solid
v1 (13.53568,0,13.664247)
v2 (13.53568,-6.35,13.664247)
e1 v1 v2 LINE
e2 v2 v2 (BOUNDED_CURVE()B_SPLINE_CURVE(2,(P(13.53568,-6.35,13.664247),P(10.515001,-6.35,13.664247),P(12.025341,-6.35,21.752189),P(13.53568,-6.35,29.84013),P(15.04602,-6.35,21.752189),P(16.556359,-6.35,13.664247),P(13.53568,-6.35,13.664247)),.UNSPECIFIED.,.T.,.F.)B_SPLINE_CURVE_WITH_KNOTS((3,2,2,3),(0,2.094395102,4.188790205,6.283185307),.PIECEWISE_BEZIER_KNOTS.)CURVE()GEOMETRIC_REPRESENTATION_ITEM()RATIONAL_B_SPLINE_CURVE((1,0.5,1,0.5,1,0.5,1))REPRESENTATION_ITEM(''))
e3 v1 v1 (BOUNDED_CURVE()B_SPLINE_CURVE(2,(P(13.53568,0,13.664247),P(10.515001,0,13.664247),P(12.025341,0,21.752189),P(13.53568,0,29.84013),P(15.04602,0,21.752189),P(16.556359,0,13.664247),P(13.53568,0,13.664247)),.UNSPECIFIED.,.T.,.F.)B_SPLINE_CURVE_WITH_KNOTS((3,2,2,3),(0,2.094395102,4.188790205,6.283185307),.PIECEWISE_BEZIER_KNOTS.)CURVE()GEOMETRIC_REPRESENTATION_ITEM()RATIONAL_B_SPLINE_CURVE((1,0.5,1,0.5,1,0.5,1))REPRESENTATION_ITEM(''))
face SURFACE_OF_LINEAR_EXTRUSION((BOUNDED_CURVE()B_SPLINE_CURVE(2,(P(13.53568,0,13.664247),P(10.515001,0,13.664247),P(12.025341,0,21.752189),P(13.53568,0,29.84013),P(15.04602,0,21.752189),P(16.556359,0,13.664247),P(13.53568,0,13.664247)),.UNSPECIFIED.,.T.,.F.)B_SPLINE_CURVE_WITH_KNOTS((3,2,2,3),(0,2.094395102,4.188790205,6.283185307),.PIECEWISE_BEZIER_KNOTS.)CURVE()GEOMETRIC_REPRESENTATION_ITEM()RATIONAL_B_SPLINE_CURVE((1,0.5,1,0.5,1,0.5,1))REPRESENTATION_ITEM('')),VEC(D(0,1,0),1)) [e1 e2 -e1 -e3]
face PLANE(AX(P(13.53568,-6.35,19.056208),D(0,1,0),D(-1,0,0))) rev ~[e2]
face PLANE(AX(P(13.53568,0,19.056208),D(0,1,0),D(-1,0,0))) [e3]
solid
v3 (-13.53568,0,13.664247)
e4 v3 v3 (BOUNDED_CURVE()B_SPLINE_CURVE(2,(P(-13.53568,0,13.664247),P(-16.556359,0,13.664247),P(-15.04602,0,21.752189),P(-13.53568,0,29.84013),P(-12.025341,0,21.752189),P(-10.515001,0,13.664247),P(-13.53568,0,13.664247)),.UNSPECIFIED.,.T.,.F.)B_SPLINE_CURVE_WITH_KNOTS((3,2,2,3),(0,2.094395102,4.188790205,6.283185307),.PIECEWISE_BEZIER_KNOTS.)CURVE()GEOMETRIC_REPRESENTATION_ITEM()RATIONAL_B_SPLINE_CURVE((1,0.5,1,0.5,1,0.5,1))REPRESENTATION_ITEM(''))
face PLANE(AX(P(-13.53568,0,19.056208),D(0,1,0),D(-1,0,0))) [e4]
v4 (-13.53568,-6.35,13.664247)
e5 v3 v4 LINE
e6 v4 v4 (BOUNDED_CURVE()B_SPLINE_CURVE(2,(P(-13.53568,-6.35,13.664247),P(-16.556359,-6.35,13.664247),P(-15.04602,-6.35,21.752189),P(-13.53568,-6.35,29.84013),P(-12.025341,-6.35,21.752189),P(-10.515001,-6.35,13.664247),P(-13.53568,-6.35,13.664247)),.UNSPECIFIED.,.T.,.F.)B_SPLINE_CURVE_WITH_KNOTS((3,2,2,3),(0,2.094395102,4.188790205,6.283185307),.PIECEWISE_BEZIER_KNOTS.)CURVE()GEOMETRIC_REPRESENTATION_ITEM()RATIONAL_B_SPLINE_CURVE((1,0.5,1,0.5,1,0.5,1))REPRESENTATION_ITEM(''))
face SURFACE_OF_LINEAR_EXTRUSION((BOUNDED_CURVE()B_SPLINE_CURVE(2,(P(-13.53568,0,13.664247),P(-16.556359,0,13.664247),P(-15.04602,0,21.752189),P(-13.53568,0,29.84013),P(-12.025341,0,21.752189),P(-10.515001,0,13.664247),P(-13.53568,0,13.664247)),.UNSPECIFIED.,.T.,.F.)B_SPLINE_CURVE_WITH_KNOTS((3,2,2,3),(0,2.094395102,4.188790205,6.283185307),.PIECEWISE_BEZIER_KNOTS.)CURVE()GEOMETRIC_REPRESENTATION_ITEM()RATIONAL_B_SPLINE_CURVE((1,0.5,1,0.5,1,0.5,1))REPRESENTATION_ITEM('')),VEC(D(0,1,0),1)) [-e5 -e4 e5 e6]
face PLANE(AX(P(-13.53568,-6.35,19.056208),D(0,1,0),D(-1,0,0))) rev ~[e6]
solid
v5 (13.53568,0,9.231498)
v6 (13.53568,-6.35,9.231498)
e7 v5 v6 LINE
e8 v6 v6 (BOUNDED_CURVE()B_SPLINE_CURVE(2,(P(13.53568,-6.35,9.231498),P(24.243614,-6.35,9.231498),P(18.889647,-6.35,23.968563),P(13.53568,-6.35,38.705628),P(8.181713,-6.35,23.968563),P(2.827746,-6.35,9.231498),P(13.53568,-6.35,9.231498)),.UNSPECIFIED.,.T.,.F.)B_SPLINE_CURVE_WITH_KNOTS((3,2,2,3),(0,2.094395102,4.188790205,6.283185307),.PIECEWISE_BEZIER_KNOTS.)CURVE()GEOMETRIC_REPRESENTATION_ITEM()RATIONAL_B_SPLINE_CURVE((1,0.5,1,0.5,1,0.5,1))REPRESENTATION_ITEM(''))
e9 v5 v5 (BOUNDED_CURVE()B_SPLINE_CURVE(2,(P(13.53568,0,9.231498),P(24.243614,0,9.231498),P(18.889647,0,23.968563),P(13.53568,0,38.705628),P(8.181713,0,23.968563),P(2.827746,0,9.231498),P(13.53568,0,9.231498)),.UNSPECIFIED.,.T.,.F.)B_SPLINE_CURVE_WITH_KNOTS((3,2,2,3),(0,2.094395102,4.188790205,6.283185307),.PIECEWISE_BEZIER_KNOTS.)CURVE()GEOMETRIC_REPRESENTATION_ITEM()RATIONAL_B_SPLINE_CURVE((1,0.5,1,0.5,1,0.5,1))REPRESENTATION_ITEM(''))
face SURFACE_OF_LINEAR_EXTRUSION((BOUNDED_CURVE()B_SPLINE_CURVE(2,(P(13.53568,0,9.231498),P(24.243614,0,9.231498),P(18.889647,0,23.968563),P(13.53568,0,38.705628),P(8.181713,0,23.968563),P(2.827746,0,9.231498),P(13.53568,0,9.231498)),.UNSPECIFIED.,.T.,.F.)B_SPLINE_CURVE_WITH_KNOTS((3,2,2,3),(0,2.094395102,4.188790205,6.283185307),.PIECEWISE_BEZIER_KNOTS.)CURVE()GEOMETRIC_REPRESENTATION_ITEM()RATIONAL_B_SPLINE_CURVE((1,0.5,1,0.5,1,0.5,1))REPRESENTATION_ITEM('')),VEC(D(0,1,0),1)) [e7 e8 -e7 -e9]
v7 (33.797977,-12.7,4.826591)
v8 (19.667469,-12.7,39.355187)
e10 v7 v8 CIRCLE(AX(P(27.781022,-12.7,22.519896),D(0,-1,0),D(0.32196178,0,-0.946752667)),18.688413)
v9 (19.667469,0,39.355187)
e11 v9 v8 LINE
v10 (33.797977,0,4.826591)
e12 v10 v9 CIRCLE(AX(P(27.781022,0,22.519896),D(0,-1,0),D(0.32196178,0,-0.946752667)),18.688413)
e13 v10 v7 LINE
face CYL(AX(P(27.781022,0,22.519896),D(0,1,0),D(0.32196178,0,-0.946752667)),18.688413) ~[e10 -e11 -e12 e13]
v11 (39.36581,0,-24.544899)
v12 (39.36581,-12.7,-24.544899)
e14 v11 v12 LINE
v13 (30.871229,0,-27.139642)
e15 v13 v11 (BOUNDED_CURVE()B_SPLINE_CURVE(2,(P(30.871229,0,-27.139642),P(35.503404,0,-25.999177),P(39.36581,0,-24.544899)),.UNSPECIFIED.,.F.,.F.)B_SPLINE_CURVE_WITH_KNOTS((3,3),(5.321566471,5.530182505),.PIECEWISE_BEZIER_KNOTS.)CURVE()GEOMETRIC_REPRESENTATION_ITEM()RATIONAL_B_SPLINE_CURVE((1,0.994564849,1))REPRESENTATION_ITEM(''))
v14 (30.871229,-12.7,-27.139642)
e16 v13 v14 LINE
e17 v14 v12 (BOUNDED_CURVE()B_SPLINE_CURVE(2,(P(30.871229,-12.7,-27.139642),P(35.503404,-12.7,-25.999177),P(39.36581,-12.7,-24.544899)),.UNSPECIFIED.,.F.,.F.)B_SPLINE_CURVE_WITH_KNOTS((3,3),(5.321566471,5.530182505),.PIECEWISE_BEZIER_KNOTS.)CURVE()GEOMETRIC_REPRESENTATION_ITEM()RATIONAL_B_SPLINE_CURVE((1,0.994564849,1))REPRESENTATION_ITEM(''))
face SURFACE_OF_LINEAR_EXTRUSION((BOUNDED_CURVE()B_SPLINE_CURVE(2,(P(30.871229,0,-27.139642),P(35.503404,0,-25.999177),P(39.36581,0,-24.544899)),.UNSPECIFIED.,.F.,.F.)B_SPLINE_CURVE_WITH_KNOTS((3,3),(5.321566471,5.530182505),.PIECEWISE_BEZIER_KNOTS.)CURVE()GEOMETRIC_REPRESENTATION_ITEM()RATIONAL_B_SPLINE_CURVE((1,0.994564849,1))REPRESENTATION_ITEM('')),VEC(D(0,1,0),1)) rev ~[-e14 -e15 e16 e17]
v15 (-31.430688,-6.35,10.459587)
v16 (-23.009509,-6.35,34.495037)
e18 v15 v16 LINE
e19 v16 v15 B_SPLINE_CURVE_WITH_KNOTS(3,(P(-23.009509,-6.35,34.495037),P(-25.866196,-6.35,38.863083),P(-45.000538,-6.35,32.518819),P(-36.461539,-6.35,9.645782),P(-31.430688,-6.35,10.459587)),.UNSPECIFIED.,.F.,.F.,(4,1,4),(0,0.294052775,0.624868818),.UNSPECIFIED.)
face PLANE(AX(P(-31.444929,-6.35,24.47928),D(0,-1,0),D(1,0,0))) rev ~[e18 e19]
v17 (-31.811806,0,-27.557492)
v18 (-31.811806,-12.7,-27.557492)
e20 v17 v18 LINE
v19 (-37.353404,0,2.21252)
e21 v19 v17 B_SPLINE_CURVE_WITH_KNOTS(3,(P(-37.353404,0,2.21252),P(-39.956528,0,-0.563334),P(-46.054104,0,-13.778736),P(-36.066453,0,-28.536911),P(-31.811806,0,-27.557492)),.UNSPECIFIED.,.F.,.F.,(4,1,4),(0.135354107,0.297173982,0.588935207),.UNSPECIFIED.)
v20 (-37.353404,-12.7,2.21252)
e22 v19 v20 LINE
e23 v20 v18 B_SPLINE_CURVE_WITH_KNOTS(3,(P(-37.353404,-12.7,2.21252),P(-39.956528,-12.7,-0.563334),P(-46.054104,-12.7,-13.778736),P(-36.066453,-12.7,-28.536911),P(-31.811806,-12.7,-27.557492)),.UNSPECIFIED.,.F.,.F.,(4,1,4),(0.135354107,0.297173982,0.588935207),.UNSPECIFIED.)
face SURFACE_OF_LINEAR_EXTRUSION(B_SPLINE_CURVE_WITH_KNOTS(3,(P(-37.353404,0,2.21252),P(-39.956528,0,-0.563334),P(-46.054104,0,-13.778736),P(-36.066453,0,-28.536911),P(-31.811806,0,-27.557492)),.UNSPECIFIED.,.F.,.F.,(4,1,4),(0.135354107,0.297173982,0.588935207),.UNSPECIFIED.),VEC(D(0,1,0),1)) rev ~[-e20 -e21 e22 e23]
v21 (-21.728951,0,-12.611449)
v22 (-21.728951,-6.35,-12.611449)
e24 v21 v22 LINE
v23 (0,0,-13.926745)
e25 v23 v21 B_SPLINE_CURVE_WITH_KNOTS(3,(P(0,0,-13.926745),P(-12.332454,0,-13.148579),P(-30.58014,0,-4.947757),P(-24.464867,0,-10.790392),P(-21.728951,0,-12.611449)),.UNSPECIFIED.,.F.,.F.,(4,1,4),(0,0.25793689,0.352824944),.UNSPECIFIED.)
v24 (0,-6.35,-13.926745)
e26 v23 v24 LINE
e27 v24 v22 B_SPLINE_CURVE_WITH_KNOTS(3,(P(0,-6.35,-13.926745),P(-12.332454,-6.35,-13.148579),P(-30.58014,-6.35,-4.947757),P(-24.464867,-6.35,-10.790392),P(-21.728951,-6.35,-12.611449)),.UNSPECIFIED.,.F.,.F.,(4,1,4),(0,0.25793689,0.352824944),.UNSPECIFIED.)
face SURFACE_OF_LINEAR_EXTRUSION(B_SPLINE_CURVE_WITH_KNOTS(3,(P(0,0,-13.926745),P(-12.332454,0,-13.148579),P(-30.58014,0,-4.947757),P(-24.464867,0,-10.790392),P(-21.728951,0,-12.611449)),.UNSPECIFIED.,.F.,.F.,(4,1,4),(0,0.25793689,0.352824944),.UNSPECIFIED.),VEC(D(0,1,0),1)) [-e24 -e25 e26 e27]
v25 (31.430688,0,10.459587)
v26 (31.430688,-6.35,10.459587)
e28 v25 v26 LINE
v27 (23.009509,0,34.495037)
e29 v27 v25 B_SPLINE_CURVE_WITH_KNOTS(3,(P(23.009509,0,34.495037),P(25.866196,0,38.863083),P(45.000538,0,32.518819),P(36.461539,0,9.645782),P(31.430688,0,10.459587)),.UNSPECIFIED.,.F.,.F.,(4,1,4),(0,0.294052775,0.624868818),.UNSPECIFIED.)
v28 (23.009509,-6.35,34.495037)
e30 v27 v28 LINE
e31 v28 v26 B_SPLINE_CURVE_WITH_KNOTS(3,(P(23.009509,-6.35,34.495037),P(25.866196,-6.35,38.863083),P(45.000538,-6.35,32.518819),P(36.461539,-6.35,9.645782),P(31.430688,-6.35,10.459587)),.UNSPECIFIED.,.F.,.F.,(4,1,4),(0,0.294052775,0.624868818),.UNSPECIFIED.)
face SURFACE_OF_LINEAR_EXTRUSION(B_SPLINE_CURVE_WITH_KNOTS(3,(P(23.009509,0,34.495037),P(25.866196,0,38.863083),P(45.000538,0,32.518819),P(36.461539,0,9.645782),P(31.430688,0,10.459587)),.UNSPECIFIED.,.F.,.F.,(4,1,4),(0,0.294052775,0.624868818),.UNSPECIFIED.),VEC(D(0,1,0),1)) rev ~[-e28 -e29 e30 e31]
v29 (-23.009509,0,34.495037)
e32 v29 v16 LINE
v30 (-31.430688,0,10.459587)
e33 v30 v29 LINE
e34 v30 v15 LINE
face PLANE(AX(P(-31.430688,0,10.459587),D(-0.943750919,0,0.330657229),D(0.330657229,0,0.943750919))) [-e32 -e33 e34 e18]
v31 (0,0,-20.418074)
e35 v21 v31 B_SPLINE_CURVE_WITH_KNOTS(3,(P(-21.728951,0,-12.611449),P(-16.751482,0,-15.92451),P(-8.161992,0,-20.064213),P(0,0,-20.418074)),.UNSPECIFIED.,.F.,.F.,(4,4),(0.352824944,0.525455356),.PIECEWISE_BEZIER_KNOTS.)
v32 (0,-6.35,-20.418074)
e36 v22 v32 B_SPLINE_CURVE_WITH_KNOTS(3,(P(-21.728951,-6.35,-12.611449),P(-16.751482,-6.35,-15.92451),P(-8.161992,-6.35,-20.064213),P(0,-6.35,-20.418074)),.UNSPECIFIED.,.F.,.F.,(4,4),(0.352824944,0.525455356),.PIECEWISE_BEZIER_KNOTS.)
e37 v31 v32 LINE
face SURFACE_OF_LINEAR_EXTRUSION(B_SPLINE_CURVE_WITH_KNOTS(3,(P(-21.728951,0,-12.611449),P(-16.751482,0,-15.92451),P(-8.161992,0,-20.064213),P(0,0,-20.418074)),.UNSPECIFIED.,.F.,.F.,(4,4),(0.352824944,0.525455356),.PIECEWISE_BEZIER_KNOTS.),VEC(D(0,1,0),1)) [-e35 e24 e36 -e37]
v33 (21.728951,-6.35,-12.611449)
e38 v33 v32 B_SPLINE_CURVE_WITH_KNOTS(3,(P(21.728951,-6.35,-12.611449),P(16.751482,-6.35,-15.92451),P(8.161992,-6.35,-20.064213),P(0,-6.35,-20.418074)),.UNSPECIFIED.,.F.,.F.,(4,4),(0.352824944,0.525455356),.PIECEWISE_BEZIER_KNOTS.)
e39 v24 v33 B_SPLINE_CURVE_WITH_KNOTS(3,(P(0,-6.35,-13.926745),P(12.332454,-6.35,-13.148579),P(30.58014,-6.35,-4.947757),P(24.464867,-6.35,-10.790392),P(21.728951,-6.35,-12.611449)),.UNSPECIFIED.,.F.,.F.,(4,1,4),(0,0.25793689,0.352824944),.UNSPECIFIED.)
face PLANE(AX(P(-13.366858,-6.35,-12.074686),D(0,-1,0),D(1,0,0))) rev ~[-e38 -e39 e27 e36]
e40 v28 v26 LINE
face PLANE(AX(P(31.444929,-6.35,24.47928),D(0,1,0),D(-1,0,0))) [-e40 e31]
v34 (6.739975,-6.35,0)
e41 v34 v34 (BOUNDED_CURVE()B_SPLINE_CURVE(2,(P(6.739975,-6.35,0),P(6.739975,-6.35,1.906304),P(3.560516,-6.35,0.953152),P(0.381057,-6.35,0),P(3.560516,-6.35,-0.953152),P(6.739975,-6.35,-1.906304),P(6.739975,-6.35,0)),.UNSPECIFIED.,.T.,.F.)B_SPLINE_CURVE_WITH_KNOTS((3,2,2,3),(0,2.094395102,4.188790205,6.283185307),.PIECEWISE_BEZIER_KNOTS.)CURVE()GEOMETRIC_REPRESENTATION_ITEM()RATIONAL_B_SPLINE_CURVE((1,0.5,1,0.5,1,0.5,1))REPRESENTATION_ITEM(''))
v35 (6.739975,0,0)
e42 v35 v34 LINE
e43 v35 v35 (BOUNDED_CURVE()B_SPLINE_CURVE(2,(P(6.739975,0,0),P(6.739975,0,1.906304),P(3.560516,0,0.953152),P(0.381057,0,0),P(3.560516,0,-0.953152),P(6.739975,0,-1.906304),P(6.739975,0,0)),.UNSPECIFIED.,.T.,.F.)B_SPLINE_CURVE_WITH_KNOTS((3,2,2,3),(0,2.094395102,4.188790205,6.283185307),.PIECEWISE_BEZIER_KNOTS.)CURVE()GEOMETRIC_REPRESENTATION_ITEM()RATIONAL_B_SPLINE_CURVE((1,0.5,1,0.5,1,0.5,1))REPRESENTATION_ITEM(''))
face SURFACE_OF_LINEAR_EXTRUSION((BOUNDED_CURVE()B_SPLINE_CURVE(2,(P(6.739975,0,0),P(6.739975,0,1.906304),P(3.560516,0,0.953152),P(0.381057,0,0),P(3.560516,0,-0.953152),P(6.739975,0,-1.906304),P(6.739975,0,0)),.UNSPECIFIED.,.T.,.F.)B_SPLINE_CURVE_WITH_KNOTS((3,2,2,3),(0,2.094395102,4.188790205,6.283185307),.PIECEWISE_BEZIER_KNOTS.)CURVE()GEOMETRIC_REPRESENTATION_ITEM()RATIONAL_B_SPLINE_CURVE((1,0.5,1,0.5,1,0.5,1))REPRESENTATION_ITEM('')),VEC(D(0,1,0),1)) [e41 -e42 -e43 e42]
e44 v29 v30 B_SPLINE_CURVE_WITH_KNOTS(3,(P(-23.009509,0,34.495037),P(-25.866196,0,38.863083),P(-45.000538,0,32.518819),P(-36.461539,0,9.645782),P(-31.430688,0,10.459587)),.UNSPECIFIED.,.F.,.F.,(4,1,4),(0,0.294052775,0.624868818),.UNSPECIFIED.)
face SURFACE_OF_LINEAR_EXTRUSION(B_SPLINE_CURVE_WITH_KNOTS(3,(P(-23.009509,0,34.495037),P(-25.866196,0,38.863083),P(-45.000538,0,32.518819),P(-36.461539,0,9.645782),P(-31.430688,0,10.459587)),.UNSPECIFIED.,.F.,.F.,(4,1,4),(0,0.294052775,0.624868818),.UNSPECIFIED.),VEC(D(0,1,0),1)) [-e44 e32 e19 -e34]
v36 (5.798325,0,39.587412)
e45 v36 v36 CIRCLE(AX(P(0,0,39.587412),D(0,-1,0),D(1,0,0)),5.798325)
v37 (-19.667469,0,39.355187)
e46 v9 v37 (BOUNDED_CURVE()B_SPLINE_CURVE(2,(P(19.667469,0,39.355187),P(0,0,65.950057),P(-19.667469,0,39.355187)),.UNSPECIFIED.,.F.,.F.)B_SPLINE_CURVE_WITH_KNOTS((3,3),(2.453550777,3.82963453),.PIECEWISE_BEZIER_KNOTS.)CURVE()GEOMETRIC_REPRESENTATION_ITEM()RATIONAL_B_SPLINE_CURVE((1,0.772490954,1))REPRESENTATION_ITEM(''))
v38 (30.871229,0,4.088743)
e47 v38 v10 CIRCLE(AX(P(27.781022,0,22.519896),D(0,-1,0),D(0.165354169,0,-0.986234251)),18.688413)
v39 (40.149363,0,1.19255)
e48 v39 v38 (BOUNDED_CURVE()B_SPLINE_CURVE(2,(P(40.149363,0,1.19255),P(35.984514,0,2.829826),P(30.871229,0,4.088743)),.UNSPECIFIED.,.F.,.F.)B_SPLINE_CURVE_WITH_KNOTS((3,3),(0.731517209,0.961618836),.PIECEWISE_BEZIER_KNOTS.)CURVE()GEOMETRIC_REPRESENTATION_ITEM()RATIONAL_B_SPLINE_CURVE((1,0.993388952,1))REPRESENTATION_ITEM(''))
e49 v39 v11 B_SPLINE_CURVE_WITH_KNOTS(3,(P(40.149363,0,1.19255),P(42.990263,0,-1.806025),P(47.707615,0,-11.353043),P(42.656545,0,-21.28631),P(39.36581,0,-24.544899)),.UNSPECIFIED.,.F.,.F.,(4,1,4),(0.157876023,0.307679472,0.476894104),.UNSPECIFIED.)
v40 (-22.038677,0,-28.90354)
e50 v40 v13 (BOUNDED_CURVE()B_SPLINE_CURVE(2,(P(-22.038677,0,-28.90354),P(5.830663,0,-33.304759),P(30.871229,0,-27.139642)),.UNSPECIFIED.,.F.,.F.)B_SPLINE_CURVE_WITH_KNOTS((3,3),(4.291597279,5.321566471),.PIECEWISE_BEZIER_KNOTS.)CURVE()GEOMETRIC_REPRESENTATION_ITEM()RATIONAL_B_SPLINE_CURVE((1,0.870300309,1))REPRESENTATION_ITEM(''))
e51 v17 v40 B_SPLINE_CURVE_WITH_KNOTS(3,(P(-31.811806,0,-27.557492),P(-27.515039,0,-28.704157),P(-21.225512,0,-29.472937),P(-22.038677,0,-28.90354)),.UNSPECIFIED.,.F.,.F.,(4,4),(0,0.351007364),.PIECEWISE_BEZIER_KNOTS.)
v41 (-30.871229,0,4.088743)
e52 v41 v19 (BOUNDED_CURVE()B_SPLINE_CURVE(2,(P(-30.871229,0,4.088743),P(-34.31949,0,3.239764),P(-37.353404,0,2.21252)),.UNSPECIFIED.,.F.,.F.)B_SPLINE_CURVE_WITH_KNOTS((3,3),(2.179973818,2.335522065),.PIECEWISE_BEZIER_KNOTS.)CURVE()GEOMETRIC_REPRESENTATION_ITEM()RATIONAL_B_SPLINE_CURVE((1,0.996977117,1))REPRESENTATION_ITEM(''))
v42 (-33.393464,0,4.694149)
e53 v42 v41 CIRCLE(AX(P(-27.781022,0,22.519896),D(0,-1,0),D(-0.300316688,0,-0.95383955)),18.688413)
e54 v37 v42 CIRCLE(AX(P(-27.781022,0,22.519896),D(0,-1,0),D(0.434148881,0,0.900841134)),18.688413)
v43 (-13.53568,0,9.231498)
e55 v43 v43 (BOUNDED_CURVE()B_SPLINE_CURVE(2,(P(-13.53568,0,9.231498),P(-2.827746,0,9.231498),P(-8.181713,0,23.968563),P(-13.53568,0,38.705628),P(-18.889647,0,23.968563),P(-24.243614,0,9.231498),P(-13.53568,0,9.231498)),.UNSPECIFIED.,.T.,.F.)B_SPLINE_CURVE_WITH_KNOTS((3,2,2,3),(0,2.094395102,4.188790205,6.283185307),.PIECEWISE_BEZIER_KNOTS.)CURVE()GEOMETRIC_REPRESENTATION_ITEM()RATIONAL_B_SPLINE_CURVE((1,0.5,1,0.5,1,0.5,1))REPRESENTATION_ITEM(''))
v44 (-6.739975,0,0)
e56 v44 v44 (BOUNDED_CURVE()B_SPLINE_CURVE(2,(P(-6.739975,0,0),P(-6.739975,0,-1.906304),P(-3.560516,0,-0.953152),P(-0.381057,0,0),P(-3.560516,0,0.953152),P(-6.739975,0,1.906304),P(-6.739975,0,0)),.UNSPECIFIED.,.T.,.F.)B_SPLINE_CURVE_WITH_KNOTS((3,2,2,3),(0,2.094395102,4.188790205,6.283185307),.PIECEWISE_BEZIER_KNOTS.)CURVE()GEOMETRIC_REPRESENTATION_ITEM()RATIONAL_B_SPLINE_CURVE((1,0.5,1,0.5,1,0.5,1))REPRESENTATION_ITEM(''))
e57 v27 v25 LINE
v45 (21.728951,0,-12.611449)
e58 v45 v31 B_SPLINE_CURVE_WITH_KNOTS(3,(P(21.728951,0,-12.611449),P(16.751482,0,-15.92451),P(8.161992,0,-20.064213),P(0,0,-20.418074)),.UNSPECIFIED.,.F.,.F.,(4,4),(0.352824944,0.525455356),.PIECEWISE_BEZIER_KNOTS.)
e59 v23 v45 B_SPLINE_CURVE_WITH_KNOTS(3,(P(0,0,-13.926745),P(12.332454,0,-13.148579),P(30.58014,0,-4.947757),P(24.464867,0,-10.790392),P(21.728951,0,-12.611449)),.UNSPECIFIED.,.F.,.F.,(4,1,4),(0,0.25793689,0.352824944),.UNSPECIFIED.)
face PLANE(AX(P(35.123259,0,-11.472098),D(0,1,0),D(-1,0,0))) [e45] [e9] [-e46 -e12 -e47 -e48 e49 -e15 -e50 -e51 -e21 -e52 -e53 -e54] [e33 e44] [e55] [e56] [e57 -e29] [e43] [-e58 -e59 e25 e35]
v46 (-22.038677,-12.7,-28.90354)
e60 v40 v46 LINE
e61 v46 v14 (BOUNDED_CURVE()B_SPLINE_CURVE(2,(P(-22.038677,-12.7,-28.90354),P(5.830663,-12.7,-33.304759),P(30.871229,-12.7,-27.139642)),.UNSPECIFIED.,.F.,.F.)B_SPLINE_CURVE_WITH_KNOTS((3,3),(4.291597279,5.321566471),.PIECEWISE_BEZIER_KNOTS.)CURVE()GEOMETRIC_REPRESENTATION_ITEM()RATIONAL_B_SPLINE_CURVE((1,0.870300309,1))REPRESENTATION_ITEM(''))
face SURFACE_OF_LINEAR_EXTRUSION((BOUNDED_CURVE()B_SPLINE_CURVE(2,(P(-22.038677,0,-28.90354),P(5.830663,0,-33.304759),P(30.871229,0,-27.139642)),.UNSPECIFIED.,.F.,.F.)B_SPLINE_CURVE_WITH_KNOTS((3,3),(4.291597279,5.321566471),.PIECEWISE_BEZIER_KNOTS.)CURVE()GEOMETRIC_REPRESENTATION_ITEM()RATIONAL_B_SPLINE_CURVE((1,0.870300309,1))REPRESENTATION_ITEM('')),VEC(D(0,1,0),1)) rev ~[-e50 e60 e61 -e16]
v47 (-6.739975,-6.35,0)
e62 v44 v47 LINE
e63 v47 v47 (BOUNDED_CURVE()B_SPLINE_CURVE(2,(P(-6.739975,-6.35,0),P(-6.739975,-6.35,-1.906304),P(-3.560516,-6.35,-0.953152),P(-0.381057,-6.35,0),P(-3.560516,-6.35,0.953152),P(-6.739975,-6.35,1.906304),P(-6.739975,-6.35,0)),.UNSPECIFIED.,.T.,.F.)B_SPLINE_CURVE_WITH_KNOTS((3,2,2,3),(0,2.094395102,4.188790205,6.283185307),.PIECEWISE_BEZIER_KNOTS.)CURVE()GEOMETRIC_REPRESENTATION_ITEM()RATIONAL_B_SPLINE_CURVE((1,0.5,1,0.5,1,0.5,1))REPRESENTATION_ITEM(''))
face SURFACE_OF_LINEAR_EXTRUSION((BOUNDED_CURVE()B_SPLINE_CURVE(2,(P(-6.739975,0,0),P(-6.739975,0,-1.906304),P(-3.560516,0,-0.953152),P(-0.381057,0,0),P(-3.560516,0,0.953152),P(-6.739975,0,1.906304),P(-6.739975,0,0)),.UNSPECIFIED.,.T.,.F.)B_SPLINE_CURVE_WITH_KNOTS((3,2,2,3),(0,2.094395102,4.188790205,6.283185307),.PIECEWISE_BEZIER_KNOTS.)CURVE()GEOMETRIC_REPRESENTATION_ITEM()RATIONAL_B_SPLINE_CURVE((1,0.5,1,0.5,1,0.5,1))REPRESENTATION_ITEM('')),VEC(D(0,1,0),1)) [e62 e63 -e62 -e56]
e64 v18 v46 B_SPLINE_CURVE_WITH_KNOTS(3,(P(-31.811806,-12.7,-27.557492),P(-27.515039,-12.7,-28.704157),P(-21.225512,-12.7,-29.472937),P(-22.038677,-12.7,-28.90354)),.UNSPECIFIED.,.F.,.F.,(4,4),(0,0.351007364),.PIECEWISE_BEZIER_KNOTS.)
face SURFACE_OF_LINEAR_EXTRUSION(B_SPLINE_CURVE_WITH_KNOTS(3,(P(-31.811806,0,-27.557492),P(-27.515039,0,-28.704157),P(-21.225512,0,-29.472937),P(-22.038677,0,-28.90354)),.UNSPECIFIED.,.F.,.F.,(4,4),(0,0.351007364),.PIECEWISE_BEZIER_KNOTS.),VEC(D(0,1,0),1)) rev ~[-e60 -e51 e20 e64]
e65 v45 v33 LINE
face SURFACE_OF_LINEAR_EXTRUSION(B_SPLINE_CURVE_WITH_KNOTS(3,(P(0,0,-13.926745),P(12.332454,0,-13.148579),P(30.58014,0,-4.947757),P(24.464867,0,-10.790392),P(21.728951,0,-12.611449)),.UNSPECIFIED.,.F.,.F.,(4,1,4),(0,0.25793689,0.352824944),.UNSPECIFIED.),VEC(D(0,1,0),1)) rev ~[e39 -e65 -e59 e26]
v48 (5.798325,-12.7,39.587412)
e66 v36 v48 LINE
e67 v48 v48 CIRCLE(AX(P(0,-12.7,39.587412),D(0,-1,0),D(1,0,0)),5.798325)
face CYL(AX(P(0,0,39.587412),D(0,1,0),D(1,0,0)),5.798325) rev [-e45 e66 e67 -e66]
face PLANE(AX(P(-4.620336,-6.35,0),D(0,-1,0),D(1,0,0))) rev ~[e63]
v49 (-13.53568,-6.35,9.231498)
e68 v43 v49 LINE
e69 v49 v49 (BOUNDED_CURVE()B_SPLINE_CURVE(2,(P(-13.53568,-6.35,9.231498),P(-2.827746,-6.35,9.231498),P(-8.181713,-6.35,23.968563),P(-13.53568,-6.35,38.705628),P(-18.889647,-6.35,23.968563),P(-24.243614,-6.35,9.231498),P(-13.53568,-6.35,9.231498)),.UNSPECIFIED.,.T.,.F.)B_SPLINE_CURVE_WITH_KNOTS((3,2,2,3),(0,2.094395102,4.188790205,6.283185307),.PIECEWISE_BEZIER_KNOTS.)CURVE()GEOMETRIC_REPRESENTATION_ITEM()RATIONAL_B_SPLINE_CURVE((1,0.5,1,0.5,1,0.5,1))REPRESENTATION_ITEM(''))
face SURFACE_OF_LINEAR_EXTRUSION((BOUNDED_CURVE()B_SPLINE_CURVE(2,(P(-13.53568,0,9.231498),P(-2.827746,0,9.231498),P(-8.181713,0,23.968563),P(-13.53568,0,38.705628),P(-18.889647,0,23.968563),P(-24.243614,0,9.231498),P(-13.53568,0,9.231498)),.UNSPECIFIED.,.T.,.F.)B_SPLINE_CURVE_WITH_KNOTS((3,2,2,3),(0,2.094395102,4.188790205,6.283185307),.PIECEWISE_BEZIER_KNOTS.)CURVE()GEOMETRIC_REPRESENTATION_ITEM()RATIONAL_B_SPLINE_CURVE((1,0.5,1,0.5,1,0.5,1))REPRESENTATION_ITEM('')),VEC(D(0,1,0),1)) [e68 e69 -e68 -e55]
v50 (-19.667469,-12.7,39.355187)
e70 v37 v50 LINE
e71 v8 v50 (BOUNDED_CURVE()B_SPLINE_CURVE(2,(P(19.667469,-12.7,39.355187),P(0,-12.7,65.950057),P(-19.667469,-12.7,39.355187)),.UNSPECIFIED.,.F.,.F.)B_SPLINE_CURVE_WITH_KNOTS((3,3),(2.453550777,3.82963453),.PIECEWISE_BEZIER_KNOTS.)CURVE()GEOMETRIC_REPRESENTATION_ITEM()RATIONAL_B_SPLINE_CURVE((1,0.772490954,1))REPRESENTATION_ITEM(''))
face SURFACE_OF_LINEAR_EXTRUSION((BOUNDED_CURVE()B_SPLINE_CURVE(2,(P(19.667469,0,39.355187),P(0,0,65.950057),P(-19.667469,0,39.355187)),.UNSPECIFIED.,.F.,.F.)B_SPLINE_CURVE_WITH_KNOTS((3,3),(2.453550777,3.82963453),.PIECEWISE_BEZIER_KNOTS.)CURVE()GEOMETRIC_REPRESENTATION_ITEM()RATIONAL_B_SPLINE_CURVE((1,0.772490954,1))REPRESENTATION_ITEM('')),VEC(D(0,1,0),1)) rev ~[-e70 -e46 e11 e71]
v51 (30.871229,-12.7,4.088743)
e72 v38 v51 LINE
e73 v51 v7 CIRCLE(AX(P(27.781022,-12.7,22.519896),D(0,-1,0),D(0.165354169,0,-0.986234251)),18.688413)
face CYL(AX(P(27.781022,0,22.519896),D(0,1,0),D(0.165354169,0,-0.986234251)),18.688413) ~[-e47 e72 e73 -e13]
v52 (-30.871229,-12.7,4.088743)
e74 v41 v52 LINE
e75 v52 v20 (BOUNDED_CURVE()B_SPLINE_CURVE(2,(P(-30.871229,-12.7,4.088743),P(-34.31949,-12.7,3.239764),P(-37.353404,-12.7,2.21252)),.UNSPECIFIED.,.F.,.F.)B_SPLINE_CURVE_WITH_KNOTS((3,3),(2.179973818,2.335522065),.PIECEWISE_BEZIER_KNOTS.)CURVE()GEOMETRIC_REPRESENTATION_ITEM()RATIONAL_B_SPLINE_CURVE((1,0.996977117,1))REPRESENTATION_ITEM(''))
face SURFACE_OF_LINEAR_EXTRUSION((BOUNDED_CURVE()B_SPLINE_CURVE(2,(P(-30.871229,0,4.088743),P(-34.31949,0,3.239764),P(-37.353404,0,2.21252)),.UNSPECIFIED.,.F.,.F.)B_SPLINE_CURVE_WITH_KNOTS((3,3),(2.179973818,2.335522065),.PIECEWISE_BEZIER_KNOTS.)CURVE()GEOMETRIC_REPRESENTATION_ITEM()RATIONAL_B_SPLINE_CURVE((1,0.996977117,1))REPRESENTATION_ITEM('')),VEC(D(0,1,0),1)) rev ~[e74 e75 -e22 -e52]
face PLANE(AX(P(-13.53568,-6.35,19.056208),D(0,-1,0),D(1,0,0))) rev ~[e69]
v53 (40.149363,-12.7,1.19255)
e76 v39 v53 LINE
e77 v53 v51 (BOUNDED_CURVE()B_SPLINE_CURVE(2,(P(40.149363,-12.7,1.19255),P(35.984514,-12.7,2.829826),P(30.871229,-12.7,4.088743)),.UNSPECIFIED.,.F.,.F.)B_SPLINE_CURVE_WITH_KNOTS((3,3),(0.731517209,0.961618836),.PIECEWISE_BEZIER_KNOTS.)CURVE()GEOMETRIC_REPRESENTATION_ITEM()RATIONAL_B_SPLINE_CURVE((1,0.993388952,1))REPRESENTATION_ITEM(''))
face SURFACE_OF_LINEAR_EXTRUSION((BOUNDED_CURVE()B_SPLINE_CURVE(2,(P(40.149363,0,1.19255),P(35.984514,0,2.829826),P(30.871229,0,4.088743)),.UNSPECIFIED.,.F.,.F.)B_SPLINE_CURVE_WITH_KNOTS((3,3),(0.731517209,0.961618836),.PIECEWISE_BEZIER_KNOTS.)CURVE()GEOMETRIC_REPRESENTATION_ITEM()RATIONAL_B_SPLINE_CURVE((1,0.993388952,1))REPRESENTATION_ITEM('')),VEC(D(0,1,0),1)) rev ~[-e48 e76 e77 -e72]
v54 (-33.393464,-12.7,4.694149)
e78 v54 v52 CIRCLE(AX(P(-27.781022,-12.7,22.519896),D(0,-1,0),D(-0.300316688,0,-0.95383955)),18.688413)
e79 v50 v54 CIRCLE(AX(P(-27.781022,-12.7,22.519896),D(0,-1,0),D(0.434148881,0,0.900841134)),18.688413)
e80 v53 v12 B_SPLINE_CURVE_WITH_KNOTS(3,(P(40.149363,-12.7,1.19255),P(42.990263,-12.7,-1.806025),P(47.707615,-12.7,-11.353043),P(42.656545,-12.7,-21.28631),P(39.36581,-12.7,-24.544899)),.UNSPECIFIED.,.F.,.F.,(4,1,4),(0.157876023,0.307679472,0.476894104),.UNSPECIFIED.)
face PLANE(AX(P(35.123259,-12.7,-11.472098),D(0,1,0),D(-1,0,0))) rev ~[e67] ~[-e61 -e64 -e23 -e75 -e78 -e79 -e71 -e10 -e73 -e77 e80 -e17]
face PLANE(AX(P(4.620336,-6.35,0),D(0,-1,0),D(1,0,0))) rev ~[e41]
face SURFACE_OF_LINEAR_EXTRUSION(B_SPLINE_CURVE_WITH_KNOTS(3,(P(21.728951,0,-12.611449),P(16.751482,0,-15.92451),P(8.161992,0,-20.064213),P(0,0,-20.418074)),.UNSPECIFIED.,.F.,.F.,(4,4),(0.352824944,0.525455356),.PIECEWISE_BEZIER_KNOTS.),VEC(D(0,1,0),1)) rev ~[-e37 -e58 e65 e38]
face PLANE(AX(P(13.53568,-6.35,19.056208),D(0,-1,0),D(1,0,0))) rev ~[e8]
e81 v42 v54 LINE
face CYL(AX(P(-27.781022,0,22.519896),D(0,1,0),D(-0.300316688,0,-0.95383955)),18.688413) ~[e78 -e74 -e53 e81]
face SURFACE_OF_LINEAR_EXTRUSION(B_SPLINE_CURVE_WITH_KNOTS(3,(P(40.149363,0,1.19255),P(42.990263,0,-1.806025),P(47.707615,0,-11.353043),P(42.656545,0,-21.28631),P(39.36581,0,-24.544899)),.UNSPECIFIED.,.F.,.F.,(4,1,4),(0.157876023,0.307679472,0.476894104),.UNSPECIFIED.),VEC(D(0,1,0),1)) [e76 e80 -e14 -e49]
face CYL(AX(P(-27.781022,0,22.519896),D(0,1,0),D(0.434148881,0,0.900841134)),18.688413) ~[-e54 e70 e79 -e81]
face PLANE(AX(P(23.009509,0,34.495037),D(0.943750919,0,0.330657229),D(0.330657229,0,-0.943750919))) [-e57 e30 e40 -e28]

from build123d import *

# Parameters (mm, degrees)
F1_DEPTH = 12.7
F3_DEPTH = 6.35
F5_DEPTH = 6.35
F6_R     = 5.7983245301
F7_DEPTH = 12.7


# Not quite as in the source:
# - a feature names something its author has since deleted; it is built from what else it names


with BuildPart() as f1:
    # F0 (on Front) → F1 (new body)
    with BuildSketch(Plane.XZ):
        with BuildLine():
            add(Edge.make_bspline(
                [(40.1493628068, 1.1925501326), (42.9902625136, -1.8060247086), (47.7076151577, -11.3530425376), (42.6565450289, -21.2863101438), (39.3658101892, -24.5448989348)],
                knots=[0.1578760235, 0.1578760235, 0.1578760235, 0.1578760235, 0.3076794717, 0.476894104, 0.476894104, 0.476894104, 0.476894104], degree=3))
            add(Edge.make_bspline(
                [(40.1493628068, 1.1925501326), (35.9845138771, 2.8298261079), (30.8712290795, 4.0887432654)],
                knots=[0.7315172092, 0.7315172092, 0.7315172092, 0.9616188361, 0.9616188361, 0.9616188361], degree=2, weights=[1, 0.9933889524, 1]))
            add(Edge.make_bspline(
                [(30.8712290795, -27.1396419515), (24.7144737369, -23.1861092597), (24.6668360543, -0.155679542), (30.8712290795, 4.0887432654)],
                knots=[0.6225566131, 0.6225566131, 0.6225566131, 0.6225566131, 1, 1, 1, 1], degree=3))
            add(Edge.make_bspline(
                [(30.8712290795, -27.1396419515), (35.5034035213, -25.9991766513), (39.3658101892, -24.5448989348)],
                knots=[5.3215664711, 5.3215664711, 5.3215664711, 5.530182505, 5.530182505, 5.530182505], degree=2, weights=[1, 0.9945648494, 1]))
        make_face()
        with BuildLine():
            add(Edge.make_bspline(
                [(30.8712290795, -27.1396419515), (24.7144737369, -23.1861092597), (24.6668360543, -0.155679542), (30.8712290795, 4.0887432654)],
                knots=[0.6225566131, 0.6225566131, 0.6225566131, 0.6225566131, 1, 1, 1, 1], degree=3))
            add(Edge.make_bspline(
                [(30.8712290795, 4.0887432654), (0, 11.6893994973), (-30.8712290795, 4.0887432654)],
                knots=[0.9616188361, 0.9616188361, 0.9616188361, 2.1799738175, 2.1799738175, 2.1799738175], degree=2, weights=[1, 0.8201189293, 1]))
            add(Edge.make_bspline(
                [(-30.316427276, -26.6621504769), (-25.7197611969, -21.8642187355), (-25.8183679957, 0.1889268802), (-30.8712290795, 4.0887432654)],
                knots=[0.6258895591, 0.6258895591, 0.6258895591, 0.6258895591, 1, 1, 1, 1], degree=3))
            add(Edge.make_bspline(
                [(-22.0386772722, -28.9035404471), (-22.6123014836, -28.5018760595), (-26.7203664064, -27.4343086812), (-30.316427276, -26.6621504769)],
                knots=[0.351007364, 0.351007364, 0.351007364, 0.351007364, 0.5986156077, 0.5986156077, 0.5986156077, 0.5986156077], degree=3))
            add(Edge.make_bspline(
                [(-22.0386772722, -28.9035404471), (5.8306627498, -33.3047588645), (30.8712290795, -27.1396419515)],
                knots=[4.2915972789, 4.2915972789, 4.2915972789, 5.3215664711, 5.3215664711, 5.3215664711], degree=2, weights=[1, 0.8703003092, 1]))
        make_face()
        with BuildLine():
            add(Edge.make_bspline(
                [(30.8712290795, 4.0887432654), (0, 11.6893994973), (-30.8712290795, 4.0887432654)],
                knots=[0.9616188361, 0.9616188361, 0.9616188361, 2.1799738175, 2.1799738175, 2.1799738175], degree=2, weights=[1, 0.8201189293, 1]))
            add(Edge.make_bspline(
                [(30.8712290795, 4.0887432654), (29.8167825832, 25.6310168931), (19.6674686975, 39.3551867716)],
                knots=[1.651139429, 1.651139429, 1.651139429, 2.4535507775, 2.4535507775, 2.4535507775], degree=2, weights=[1, 0.920590813, 1]))
            add(Edge.make_bspline(
                [(19.6674686975, 39.3551867716), (0, 65.9500565848), (-19.6674686975, 39.3551867716)],
                knots=[2.4535507775, 2.4535507775, 2.4535507775, 3.8296345296, 3.8296345296, 3.8296345296], degree=2, weights=[1, 0.7724909543, 1]))
            add(Edge.make_bspline(
                [(-19.6674686975, 39.3551867716), (-29.8167825832, 25.6310168931), (-30.8712290795, 4.0887432654)],
                knots=[3.8296345296, 3.8296345296, 3.8296345296, 4.6320458782, 4.6320458782, 4.6320458782], degree=2, weights=[1, 0.920590813, 1]))
        make_face()
        with BuildLine():
            add(Edge.make_bspline(
                [(30.8712290795, 4.0887432654), (29.8167825832, 25.6310168931), (19.6674686975, 39.3551867716)],
                knots=[1.651139429, 1.651139429, 1.651139429, 2.4535507775, 2.4535507775, 2.4535507775], degree=2, weights=[1, 0.920590813, 1]))
            add(Edge.make_bspline(
                [(30.8712290795, 4.0887432654), (31.745474043, 4.6868138982), (32.7438524431, 4.9118902663), (33.7979767486, 4.8265914139)],
                knots=[0, 0, 0, 0, 0.0531845708, 0.0531845708, 0.0531845708, 0.0531845708], degree=3))
            ThreePointArc((33.7979767486, 4.8265914139), (45.0771172482, 29.5981627551), (19.6674686975, 39.3551867716))
        make_face()
        with BuildLine():
            add(Edge.make_bspline(
                [(30.8712290795, 4.0887432654), (31.745474043, 4.6868138982), (32.7438524431, 4.9118902663), (33.7979767486, 4.8265914139)],
                knots=[0, 0, 0, 0, 0.0531845708, 0.0531845708, 0.0531845708, 0.0531845708], degree=3))
            ThreePointArc((30.8712290795, 4.0887432654), (32.3495232988, 4.3984841575), (33.7979767486, 4.8265914139))
        make_face()
        with BuildLine():
            add(Edge.make_bspline(
                [(-30.316427276, -26.6621504769), (-25.7197611969, -21.8642187355), (-25.8183679957, 0.1889268802), (-30.8712290795, 4.0887432654)],
                knots=[0.6258895591, 0.6258895591, 0.6258895591, 0.6258895591, 1, 1, 1, 1], degree=3))
            add(Edge.make_bspline(
                [(-30.8712290795, 4.0887432654), (-34.319490328, 3.2397635154), (-37.3534035771, 2.2125195676)],
                knots=[2.1799738175, 2.1799738175, 2.1799738175, 2.335522065, 2.335522065, 2.335522065], degree=2, weights=[1, 0.996977117, 1]))
            add(Edge.make_bspline(
                [(-37.3534035771, 2.2125195676), (-39.9565279998, -0.5633337342), (-46.0541036061, -13.7787361602), (-36.0664526702, -28.5369114032), (-31.8118056749, -27.5574924828)],
                knots=[0.1353541067, 0.1353541067, 0.1353541067, 0.1353541067, 0.2971739822, 0.5889352074, 0.5889352074, 0.5889352074, 0.5889352074], degree=3))
            add(Edge.make_bspline(
                [(-30.316427276, -26.6621504769), (-32.7944749747, -26.1300557959), (-38.0519143989, -25.2083426228), (-34.6365631834, -26.8036586224), (-31.8118056749, -27.5574924828)],
                knots=[0.5986156077, 0.5986156077, 0.5986156077, 0.5986156077, 0.7692425968, 1, 1, 1, 1], degree=3))
        make_face()
        with BuildLine():
            add(Edge.make_bspline(
                [(-30.8712290795, 4.0887432654), (-31.6240605241, 4.6697812862), (-32.4868682621, 4.8478452679), (-33.3934643409, 4.6941488206)],
                knots=[0, 0, 0, 0, 0.0557391345, 0.0557391345, 0.0557391345, 0.0557391345], degree=3))
            add(Edge.make_bspline(
                [(-19.6674686975, 39.3551867716), (-29.8167825832, 25.6310168931), (-30.8712290795, 4.0887432654)],
                knots=[3.8296345296, 3.8296345296, 3.8296345296, 4.6320458782, 4.6320458782, 4.6320458782], degree=2, weights=[1, 0.920590813, 1]))
            ThreePointArc((-19.6674686975, 39.3551867716), (-45.1566020526, 29.4007381707), (-33.3934643409, 4.6941488206))
        make_face()
        with BuildLine():
            ThreePointArc((-33.3934643409, 4.6941488206), (-32.1428628623, 4.3476337433), (-30.8712290795, 4.0887432654))
            add(Edge.make_bspline(
                [(-30.8712290795, 4.0887432654), (-31.6240605241, 4.6697812862), (-32.4868682621, 4.8478452679), (-33.3934643409, 4.6941488206)],
                knots=[0, 0, 0, 0, 0.0557391345, 0.0557391345, 0.0557391345, 0.0557391345], degree=3))
        make_face()
        with BuildLine():
            add(Edge.make_bspline(
                [(-22.0386772722, -28.9035404471), (-22.6123014836, -28.5018760595), (-26.7203664064, -27.4343086812), (-30.316427276, -26.6621504769)],
                knots=[0.351007364, 0.351007364, 0.351007364, 0.351007364, 0.5986156077, 0.5986156077, 0.5986156077, 0.5986156077], degree=3))
            add(Edge.make_bspline(
                [(-31.8118056749, -27.5574924828), (-31.4840598446, -27.4820454557), (-30.9663386258, -27.2558139926), (-30.4943329872, -26.8478458143), (-30.316427276, -26.6621504769)],
                knots=[0.5889352074, 0.5889352074, 0.5889352074, 0.5889352074, 0.6114102859, 0.6258895591, 0.6258895591, 0.6258895591, 0.6258895591], degree=3))
            add(Edge.make_bspline(
                [(-31.8118056749, -27.5574924828), (-27.5150391443, -28.7041566093), (-21.2255124143, -29.4729365051), (-22.0386772722, -28.9035404471)],
                knots=[0, 0, 0, 0, 0.351007364, 0.351007364, 0.351007364, 0.351007364], degree=3))
        make_face()
        with BuildLine():
            add(Edge.make_bspline(
                [(-31.8118056749, -27.5574924828), (-31.4840598446, -27.4820454557), (-30.9663386258, -27.2558139926), (-30.4943329872, -26.8478458143), (-30.316427276, -26.6621504769)],
                knots=[0.5889352074, 0.5889352074, 0.5889352074, 0.5889352074, 0.6114102859, 0.6258895591, 0.6258895591, 0.6258895591, 0.6258895591], degree=3))
            add(Edge.make_bspline(
                [(-30.316427276, -26.6621504769), (-32.7944749747, -26.1300557959), (-38.0519143989, -25.2083426228), (-34.6365631834, -26.8036586224), (-31.8118056749, -27.5574924828)],
                knots=[0.5986156077, 0.5986156077, 0.5986156077, 0.5986156077, 0.7692425968, 1, 1, 1, 1], degree=3))
        make_face()
    extrude(amount=F1_DEPTH)

    # F2 (on Front) → F3 (cut)
    with BuildSketch(Plane.XZ):
        with BuildLine():
            Line((-31.4306877553, 10.459586978), (-23.0095088482, 34.4950370491))
            add(Edge.make_bspline(
                [(-23.0095088482, 34.4950370491), (-25.8661962885, 38.8630829165), (-45.0005379548, 32.5188186692), (-36.4615387565, 9.6457820973), (-31.4306877553, 10.459586978)],
                knots=[0, 0, 0, 0, 0.2940527748, 0.6248688178, 0.6248688178, 0.6248688178, 0.6248688178], degree=3))
        make_face()
        with BuildLine():
            add(Edge.make_bspline(
                [(-13.5356802493, 9.2314984649), (-2.8277460367, 9.2314984649), (-8.181713143, 23.9685634151), (-13.5356802493, 38.7056283653), (-18.8896473556, 23.9685634151), (-24.2436144619, 9.2314984649), (-13.5356802493, 9.2314984649)],
                knots=[0, 0, 0, 2.0943951024, 2.0943951024, 4.1887902048, 4.1887902048, 6.2831853072, 6.2831853072, 6.2831853072], degree=2, weights=[1, 0.5, 1, 0.5, 1, 0.5, 1]))
        make_face()
        with BuildLine():
            add(Edge.make_bspline(
                [(-21.7289508062, -12.611449449), (-21.7321865207, -12.5803032561), (-21.7163109163, -10.9862071439), (-11.1745113639, -14.6318470824), (0, -13.9267453924)],
                knots=[0.7618847301, 0.7618847301, 0.7618847301, 0.7618847301, 0.7662818157, 1, 1, 1, 1], degree=3))
            add(Edge.make_bspline(
                [(0, -13.9267453924), (-12.3324538091, -13.1485785679), (-30.5801397036, -4.9477572556), (-24.4648668208, -10.7903922273), (-21.7289508062, -12.611449449)],
                knots=[0, 0, 0, 0, 0.2579368903, 0.3528249437, 0.3528249437, 0.3528249437, 0.3528249437], degree=3))
        make_face()
        with BuildLine():
            add(Edge.make_bspline(
                [(0, -13.9267453924), (12.3324538091, -13.1485785679), (30.5801396984, -4.9477572579), (24.4648668243, -10.790392224), (21.7289508149, -12.6114494432)],
                knots=[0, 0, 0, 0, 0.2579368903, 0.3528249436, 0.3528249436, 0.3528249436, 0.3528249436], degree=3))
            add(Edge.make_bspline(
                [(21.7289508074, -12.6114494375), (21.7321865206, -12.5803032489), (21.7163108924, -10.9862071522), (11.1745113639, -14.6318470824), (0, -13.9267453924)],
                knots=[0.7618847306, 0.7618847306, 0.7618847306, 0.7618847306, 0.7662818157, 1, 1, 1, 1], degree=3))
        make_face()
        with BuildLine():
            add(Edge.make_bspline(
                [(21.7289508074, -12.6114494375), (21.7321865206, -12.5803032489), (21.7163108924, -10.9862071522), (11.1745113639, -14.6318470824), (0, -13.9267453924)],
                knots=[0.7618847306, 0.7618847306, 0.7618847306, 0.7618847306, 0.7662818157, 1, 1, 1, 1], degree=3))
            add(Edge.make_bspline(
                [(-21.7289508062, -12.611449449), (-21.7321865207, -12.5803032561), (-21.7163109163, -10.9862071439), (-11.1745113639, -14.6318470824), (0, -13.9267453924)],
                knots=[0.7618847301, 0.7618847301, 0.7618847301, 0.7618847301, 0.7662818157, 1, 1, 1, 1], degree=3))
            add(Edge.make_bspline(
                [(-21.7289508062, -12.611449449), (-16.7514821777, -15.9245099169), (-8.1619923275, -20.0642127089), (-3.62e-08, -20.4180739804)],
                knots=[0.3528249437, 0.3528249437, 0.3528249437, 0.3528249437, 0.5254553557, 0.5254553557, 0.5254553557, 0.5254553557], degree=3))
            add(Edge.make_bspline(
                [(21.7289508149, -12.6114494432), (16.7514821877, -15.9245099121), (8.1619922942, -20.064212727), (-3.62e-08, -20.4180739836)],
                knots=[0.3528249436, 0.3528249436, 0.3528249436, 0.3528249436, 0.5254553557, 0.5254553557, 0.5254553557, 0.5254553557], degree=3))
        make_face()
        with BuildLine():
            add(Edge.make_bspline(
                [(23.0095088482, 34.4950370491), (25.8661962885, 38.8630829165), (45.0005379548, 32.5188186692), (36.4615387565, 9.6457820973), (31.4306877553, 10.459586978)],
                knots=[0, 0, 0, 0, 0.2940527748, 0.6248688178, 0.6248688178, 0.6248688178, 0.6248688178], degree=3))
            Line((23.0095088482, 34.4950370491), (31.4306877553, 10.459586978))
        make_face()
        with BuildLine():
            add(Edge.make_bspline(
                [(13.5356802493, 9.2314984649), (24.2436144619, 9.2314984649), (18.8896473556, 23.9685634151), (13.5356802493, 38.7056283653), (8.181713143, 23.9685634151), (2.8277460367, 9.2314984649), (13.5356802493, 9.2314984649)],
                knots=[0, 0, 0, 2.0943951024, 2.0943951024, 4.1887902048, 4.1887902048, 6.2831853072, 6.2831853072, 6.2831853072], degree=2, weights=[1, 0.5, 1, 0.5, 1, 0.5, 1]))
        make_face()
        with BuildLine():
            add(Edge.make_bspline(
                [(-6.7399754189, 0), (-6.7399754189, -1.9063044273), (-3.5605162848, -0.9531522136), (-0.3810571507, 0), (-3.5605162848, 0.9531522136), (-6.7399754189, 1.9063044273), (-6.7399754189, 0)],
                knots=[0, 0, 0, 2.0943951024, 2.0943951024, 4.1887902048, 4.1887902048, 6.2831853072, 6.2831853072, 6.2831853072], degree=2, weights=[1, 0.5, 1, 0.5, 1, 0.5, 1]))
        make_face()
        with BuildLine():
            add(Edge.make_bspline(
                [(6.7399754189, 0), (6.7399754189, 1.9063044273), (3.5605162848, 0.9531522136), (0.3810571507, 0), (3.5605162848, -0.9531522136), (6.7399754189, -1.9063044273), (6.7399754189, 0)],
                knots=[0, 0, 0, 2.0943951024, 2.0943951024, 4.1887902048, 4.1887902048, 6.2831853072, 6.2831853072, 6.2831853072], degree=2, weights=[1, 0.5, 1, 0.5, 1, 0.5, 1]))
        make_face()
    extrude(amount=F3_DEPTH, mode=Mode.SUBTRACT)

    # F6 (on Front) → F7 (cut)
    with BuildSketch(Plane.XZ):
        with Locations((0, 39.5874120295)):
            Circle(F6_R)
    extrude(amount=F7_DEPTH, mode=Mode.SUBTRACT)


with BuildPart() as f5:
    # F4 (on face) → F5 (new body)
    with BuildSketch(Plane(origin=(0, 0, 0), x_dir=(-1, 0, 0), z_dir=(0, 1, 0))):
        with BuildLine():
            add(Edge.make_bspline(
                [(-13.5356802493, 13.6642474681), (-10.5150010112, 13.6642474681), (-12.0253406303, 21.7521889135), (-13.5356802493, 29.8401303589), (-15.0460198684, 21.7521889135), (-16.5563594875, 13.6642474681), (-13.5356802493, 13.6642474681)],
                knots=[0, 0, 0, 2.0943951024, 2.0943951024, 4.1887902048, 4.1887902048, 6.2831853072, 6.2831853072, 6.2831853072], degree=2, weights=[1, 0.5, 1, 0.5, 1, 0.5, 1]))
        make_face()
    extrude(amount=-F5_DEPTH)


with BuildPart() as f5b:
    # F4 (on face) → F5, piece 2 (new body)
    with BuildSketch(Plane(origin=(0, 0, 0), x_dir=(-1, 0, 0), z_dir=(0, 1, 0))):
        with BuildLine():
            add(Edge.make_bspline(
                [(13.5356802493, 13.6642474681), (16.5563594875, 13.6642474681), (15.0460198684, 21.7521889135), (13.5356802493, 29.8401303589), (12.0253406303, 21.7521889135), (10.5150010112, 13.6642474681), (13.5356802493, 13.6642474681)],
                knots=[0, 0, 0, 2.0943951024, 2.0943951024, 4.1887902048, 4.1887902048, 6.2831853072, 6.2831853072, 6.2831853072], degree=2, weights=[1, 0.5, 1, 0.5, 1, 0.5, 1]))
        make_face()
    extrude(amount=-F5_DEPTH)


solid = Compound([f1.part, f5.part, f5b.part])
